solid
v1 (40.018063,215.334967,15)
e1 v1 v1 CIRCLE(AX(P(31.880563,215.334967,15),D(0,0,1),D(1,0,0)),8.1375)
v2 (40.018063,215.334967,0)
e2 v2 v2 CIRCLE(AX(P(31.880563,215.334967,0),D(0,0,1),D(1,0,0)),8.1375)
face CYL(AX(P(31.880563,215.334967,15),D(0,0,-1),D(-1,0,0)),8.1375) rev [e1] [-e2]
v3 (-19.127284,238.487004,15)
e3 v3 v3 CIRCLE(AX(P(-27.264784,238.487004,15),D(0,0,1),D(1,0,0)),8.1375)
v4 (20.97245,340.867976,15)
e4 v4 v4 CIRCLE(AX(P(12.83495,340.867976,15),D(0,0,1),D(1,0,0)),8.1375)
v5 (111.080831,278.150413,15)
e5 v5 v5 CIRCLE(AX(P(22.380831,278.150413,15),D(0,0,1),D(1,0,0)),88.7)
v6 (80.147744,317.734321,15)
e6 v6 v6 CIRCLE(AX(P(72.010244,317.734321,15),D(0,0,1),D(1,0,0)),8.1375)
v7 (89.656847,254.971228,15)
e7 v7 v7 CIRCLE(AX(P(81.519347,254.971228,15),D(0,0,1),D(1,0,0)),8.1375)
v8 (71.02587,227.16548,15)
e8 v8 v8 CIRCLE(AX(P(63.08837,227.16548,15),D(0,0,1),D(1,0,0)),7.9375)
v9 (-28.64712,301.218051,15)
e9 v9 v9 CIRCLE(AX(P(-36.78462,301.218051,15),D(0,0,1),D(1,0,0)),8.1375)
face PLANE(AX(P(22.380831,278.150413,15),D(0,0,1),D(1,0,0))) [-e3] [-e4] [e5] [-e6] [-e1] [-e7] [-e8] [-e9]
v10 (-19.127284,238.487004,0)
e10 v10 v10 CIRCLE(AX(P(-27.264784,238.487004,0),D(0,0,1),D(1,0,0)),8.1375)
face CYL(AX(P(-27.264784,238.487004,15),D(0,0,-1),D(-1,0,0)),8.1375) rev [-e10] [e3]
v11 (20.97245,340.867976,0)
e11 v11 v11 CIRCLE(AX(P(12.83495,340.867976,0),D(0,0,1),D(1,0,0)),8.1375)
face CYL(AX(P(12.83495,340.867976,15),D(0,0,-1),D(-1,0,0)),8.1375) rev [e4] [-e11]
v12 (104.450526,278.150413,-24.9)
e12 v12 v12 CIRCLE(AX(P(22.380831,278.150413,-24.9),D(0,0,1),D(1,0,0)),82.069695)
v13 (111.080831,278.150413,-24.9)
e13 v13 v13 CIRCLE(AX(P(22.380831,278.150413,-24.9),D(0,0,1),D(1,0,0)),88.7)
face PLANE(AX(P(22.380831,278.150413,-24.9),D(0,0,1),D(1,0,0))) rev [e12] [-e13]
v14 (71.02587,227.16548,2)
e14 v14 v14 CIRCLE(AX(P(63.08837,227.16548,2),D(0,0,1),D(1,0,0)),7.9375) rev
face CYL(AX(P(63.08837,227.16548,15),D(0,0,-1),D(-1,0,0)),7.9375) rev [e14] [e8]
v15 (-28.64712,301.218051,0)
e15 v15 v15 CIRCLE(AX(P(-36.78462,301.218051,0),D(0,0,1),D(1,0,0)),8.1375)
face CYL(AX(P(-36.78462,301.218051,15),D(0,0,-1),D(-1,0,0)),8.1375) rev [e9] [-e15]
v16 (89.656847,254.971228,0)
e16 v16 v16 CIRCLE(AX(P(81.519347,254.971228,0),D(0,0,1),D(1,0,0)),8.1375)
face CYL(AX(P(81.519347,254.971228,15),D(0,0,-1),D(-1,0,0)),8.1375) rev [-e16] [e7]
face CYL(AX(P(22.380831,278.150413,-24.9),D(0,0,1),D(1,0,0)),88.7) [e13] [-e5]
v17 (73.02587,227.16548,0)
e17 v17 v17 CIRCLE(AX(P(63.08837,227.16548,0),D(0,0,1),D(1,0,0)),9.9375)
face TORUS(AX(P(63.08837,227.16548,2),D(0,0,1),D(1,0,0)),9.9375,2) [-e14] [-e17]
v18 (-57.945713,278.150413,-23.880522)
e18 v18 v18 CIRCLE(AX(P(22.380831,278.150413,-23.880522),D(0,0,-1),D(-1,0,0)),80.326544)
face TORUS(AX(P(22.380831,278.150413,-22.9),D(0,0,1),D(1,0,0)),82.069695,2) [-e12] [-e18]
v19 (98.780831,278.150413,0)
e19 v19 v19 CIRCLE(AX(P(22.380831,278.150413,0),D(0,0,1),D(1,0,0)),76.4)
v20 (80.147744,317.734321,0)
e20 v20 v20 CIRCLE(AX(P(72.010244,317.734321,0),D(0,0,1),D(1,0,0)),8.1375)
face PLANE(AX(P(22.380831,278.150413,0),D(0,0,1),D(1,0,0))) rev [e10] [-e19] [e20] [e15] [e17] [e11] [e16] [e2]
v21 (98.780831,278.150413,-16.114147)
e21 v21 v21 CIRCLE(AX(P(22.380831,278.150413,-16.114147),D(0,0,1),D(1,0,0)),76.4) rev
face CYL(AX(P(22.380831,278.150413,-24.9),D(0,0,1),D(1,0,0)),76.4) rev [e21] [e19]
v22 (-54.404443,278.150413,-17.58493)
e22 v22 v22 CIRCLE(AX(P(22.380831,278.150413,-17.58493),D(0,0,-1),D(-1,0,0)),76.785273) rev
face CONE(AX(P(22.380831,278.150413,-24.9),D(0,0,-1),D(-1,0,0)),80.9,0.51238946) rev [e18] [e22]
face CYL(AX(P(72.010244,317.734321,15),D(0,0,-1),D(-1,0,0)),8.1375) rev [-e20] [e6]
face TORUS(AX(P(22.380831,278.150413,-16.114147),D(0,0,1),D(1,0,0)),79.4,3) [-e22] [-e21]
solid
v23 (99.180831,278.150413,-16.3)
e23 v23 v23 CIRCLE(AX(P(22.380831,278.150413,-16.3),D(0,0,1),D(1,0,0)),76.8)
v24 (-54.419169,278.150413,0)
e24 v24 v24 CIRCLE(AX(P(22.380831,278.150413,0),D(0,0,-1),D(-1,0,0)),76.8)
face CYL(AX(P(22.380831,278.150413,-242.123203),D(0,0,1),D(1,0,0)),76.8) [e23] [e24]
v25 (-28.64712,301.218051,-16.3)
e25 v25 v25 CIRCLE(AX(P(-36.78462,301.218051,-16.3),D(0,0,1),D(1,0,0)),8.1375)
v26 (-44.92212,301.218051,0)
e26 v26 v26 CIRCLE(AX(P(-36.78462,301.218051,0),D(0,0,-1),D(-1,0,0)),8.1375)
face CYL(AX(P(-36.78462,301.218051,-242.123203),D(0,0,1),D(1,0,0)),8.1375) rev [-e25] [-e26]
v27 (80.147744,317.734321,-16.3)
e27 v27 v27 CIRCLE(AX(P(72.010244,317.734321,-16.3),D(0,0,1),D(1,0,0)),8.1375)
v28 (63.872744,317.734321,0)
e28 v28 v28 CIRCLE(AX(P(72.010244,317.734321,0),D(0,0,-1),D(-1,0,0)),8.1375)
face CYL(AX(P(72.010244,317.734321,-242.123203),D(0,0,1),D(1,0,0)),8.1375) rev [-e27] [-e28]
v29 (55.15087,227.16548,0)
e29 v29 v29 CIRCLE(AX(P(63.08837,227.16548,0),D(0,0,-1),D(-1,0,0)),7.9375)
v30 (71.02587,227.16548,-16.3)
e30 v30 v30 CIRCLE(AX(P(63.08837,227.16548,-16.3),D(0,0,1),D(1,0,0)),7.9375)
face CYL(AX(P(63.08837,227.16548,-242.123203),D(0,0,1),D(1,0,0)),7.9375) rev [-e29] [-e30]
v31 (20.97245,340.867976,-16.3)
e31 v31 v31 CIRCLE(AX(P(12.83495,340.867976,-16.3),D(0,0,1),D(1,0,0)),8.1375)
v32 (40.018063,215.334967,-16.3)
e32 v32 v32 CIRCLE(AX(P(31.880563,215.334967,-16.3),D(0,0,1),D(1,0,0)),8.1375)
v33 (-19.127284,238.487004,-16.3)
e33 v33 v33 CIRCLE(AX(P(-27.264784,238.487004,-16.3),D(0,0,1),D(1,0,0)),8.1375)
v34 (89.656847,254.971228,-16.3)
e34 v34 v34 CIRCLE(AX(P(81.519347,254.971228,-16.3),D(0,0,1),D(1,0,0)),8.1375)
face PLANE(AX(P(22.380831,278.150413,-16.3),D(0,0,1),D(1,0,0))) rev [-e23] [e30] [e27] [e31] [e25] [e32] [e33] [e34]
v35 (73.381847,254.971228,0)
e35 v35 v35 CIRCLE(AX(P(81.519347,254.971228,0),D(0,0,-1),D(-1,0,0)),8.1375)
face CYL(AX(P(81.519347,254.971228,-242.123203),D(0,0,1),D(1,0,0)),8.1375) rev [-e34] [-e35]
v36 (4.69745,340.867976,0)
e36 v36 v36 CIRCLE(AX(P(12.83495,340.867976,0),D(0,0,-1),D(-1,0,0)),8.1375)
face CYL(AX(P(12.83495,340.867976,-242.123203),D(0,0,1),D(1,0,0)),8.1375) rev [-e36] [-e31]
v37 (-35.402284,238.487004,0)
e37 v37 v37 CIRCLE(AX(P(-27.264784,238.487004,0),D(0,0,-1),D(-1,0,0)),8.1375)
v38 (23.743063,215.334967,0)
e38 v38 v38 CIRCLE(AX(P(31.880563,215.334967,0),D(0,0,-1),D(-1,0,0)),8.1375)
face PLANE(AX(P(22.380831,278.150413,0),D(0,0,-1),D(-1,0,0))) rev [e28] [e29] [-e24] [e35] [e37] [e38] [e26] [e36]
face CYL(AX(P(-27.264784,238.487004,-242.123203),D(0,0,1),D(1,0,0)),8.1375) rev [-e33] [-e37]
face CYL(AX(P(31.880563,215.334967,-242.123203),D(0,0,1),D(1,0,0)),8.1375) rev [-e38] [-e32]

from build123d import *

# Parameters (mm, degrees)
SKETCH2_R           = 88.7
BOSS_EXTRUDE1_DEPTH = 24.9
BOSS_EXTRUDE2_START = 15
SKETCH3_R           = 88.7
SKETCH3_R_2         = 7.9375
SKETCH3_R_3         = 8.1375
BOSS_EXTRUDE2_DEPTH = 15
FILLET1_R           = 2
FILLET2_R           = 3
FILLET3_R           = 2
SKETCH4_R           = 76.8
SKETCH4_R_2         = 8.1375
SKETCH4_R_3         = 7.9375
BOSS_EXTRUDE3_DEPTH = 16.3


with BuildPart() as part:
    # Sketch2 → Boss-Extrude1 (new body)
    with BuildSketch(Plane.XY):
        with Locations((22.380830856, 278.150413141)):
            Circle(SKETCH2_R)
        with BuildLine():
            ThreePointArc((22.380830856, 354.550413141), (-54.019169144, 278.150413141), (22.380830856, 201.750413141))
            ThreePointArc((22.380830856, 201.750413141), (98.780830856, 278.150413141), (22.380830856, 354.550413141))
        make_face(mode=Mode.SUBTRACT)
    extrude(amount=-BOSS_EXTRUDE1_DEPTH)

    # Sketch3 → Boss-Extrude2 (add)
    with BuildSketch(Plane.XY.offset(BOSS_EXTRUDE2_START)):
        with Locations((22.380830856, 278.150413141)):
            Circle(SKETCH3_R)
        with Locations((63.088370199, 227.165480073)):
            Circle(SKETCH3_R_2, mode=Mode.SUBTRACT)
        with Locations((12.834949907, 340.867975839)):
            Circle(SKETCH3_R_3, mode=Mode.SUBTRACT)
        with Locations((72.010243633, 317.73432135)):
            Circle(SKETCH3_R_3, mode=Mode.SUBTRACT)
        with Locations((-36.784620153, 301.21805109)):
            Circle(SKETCH3_R_3, mode=Mode.SUBTRACT)
        with Locations((-27.264784017, 238.487003795)):
            Circle(SKETCH3_R_3, mode=Mode.SUBTRACT)
        with Locations((31.880563493, 215.334967411)):
            Circle(SKETCH3_R_3, mode=Mode.SUBTRACT)
        with Locations((81.519347087, 254.971228106)):
            Circle(SKETCH3_R_3, mode=Mode.SUBTRACT)
    extrude(amount=-BOSS_EXTRUDE2_DEPTH)

    # Fillet1
    fillet1_edges = [part.edges().sort_by_distance(p)[0] for p in [
        (55.150870199, 227.165480073, 0),
    ]]
    fillet(fillet1_edges, radius=FILLET1_R)

    # Chamfer1: read off the stored shape, not the designer's step
    # Chamfer1 outline → Chamfer1 (revolve, cut)
    with BuildSketch(Plane(origin=(22.380830856, 278.150413141, 0), x_dir=(1, 0, 0), z_dir=(0, -1, 0))):
        Polygon((80.9, -24.9), (76.4, -16.9), (76.4, -24.9), align=None)
    revolve(axis=Axis((22.380830856, 278.150413141, 0), (0, 0, 1)), mode=Mode.SUBTRACT)

    # Fillet2
    fillet2_edges = [part.edges().sort_by_distance(p)[0] for p in [
        (76.403788939, 332.173371224, -16.9),
    ]]
    fillet(fillet2_edges, radius=FILLET2_R)

    # Fillet3
    fillet3_edges = [part.edges().sort_by_distance(p)[0] for p in [
        (-58.519169144, 278.150413141, -24.9),
    ]]
    fillet(fillet3_edges, radius=FILLET3_R)


with BuildPart() as body_2:
    # Sketch4 → Boss-Extrude3 (new body)
    with BuildSketch(Plane(origin=(0, 0, 0), x_dir=(-1, 0, 0), z_dir=(0, 0, -1))):
        with Locations(Location((-22.380830856, 278.150413141, 0), (0, 0, 180))):
            Circle(SKETCH4_R)
        with Locations(Location((27.264784017, 238.487003795, 0), (0, 0, 180))):
            Circle(SKETCH4_R_2, mode=Mode.SUBTRACT)
        with Locations(Location((-31.880563493, 215.334967411, 0), (0, 0, 180))):
            Circle(SKETCH4_R_2, mode=Mode.SUBTRACT)
        with Locations(Location((-63.088370199, 227.165480073, 0), (0, 0, 180))):
            Circle(SKETCH4_R_3, mode=Mode.SUBTRACT)
        with Locations(Location((-81.519347087, 254.971228106, 0), (0, 0, 180))):
            Circle(SKETCH4_R_2, mode=Mode.SUBTRACT)
        with Locations(Location((36.784620153, 301.21805109, 0), (0, 0, 180))):
            Circle(SKETCH4_R_2, mode=Mode.SUBTRACT)
        with Locations(Location((-12.834949907, 340.867975839, 0), (0, 0, 180))):
            Circle(SKETCH4_R_2, mode=Mode.SUBTRACT)
        with Locations(Location((-72.010243633, 317.73432135, 0), (0, 0, 180))):
            Circle(SKETCH4_R_2, mode=Mode.SUBTRACT)
    extrude(amount=BOSS_EXTRUDE3_DEPTH)


solid = Compound([part.part, body_2.part])
